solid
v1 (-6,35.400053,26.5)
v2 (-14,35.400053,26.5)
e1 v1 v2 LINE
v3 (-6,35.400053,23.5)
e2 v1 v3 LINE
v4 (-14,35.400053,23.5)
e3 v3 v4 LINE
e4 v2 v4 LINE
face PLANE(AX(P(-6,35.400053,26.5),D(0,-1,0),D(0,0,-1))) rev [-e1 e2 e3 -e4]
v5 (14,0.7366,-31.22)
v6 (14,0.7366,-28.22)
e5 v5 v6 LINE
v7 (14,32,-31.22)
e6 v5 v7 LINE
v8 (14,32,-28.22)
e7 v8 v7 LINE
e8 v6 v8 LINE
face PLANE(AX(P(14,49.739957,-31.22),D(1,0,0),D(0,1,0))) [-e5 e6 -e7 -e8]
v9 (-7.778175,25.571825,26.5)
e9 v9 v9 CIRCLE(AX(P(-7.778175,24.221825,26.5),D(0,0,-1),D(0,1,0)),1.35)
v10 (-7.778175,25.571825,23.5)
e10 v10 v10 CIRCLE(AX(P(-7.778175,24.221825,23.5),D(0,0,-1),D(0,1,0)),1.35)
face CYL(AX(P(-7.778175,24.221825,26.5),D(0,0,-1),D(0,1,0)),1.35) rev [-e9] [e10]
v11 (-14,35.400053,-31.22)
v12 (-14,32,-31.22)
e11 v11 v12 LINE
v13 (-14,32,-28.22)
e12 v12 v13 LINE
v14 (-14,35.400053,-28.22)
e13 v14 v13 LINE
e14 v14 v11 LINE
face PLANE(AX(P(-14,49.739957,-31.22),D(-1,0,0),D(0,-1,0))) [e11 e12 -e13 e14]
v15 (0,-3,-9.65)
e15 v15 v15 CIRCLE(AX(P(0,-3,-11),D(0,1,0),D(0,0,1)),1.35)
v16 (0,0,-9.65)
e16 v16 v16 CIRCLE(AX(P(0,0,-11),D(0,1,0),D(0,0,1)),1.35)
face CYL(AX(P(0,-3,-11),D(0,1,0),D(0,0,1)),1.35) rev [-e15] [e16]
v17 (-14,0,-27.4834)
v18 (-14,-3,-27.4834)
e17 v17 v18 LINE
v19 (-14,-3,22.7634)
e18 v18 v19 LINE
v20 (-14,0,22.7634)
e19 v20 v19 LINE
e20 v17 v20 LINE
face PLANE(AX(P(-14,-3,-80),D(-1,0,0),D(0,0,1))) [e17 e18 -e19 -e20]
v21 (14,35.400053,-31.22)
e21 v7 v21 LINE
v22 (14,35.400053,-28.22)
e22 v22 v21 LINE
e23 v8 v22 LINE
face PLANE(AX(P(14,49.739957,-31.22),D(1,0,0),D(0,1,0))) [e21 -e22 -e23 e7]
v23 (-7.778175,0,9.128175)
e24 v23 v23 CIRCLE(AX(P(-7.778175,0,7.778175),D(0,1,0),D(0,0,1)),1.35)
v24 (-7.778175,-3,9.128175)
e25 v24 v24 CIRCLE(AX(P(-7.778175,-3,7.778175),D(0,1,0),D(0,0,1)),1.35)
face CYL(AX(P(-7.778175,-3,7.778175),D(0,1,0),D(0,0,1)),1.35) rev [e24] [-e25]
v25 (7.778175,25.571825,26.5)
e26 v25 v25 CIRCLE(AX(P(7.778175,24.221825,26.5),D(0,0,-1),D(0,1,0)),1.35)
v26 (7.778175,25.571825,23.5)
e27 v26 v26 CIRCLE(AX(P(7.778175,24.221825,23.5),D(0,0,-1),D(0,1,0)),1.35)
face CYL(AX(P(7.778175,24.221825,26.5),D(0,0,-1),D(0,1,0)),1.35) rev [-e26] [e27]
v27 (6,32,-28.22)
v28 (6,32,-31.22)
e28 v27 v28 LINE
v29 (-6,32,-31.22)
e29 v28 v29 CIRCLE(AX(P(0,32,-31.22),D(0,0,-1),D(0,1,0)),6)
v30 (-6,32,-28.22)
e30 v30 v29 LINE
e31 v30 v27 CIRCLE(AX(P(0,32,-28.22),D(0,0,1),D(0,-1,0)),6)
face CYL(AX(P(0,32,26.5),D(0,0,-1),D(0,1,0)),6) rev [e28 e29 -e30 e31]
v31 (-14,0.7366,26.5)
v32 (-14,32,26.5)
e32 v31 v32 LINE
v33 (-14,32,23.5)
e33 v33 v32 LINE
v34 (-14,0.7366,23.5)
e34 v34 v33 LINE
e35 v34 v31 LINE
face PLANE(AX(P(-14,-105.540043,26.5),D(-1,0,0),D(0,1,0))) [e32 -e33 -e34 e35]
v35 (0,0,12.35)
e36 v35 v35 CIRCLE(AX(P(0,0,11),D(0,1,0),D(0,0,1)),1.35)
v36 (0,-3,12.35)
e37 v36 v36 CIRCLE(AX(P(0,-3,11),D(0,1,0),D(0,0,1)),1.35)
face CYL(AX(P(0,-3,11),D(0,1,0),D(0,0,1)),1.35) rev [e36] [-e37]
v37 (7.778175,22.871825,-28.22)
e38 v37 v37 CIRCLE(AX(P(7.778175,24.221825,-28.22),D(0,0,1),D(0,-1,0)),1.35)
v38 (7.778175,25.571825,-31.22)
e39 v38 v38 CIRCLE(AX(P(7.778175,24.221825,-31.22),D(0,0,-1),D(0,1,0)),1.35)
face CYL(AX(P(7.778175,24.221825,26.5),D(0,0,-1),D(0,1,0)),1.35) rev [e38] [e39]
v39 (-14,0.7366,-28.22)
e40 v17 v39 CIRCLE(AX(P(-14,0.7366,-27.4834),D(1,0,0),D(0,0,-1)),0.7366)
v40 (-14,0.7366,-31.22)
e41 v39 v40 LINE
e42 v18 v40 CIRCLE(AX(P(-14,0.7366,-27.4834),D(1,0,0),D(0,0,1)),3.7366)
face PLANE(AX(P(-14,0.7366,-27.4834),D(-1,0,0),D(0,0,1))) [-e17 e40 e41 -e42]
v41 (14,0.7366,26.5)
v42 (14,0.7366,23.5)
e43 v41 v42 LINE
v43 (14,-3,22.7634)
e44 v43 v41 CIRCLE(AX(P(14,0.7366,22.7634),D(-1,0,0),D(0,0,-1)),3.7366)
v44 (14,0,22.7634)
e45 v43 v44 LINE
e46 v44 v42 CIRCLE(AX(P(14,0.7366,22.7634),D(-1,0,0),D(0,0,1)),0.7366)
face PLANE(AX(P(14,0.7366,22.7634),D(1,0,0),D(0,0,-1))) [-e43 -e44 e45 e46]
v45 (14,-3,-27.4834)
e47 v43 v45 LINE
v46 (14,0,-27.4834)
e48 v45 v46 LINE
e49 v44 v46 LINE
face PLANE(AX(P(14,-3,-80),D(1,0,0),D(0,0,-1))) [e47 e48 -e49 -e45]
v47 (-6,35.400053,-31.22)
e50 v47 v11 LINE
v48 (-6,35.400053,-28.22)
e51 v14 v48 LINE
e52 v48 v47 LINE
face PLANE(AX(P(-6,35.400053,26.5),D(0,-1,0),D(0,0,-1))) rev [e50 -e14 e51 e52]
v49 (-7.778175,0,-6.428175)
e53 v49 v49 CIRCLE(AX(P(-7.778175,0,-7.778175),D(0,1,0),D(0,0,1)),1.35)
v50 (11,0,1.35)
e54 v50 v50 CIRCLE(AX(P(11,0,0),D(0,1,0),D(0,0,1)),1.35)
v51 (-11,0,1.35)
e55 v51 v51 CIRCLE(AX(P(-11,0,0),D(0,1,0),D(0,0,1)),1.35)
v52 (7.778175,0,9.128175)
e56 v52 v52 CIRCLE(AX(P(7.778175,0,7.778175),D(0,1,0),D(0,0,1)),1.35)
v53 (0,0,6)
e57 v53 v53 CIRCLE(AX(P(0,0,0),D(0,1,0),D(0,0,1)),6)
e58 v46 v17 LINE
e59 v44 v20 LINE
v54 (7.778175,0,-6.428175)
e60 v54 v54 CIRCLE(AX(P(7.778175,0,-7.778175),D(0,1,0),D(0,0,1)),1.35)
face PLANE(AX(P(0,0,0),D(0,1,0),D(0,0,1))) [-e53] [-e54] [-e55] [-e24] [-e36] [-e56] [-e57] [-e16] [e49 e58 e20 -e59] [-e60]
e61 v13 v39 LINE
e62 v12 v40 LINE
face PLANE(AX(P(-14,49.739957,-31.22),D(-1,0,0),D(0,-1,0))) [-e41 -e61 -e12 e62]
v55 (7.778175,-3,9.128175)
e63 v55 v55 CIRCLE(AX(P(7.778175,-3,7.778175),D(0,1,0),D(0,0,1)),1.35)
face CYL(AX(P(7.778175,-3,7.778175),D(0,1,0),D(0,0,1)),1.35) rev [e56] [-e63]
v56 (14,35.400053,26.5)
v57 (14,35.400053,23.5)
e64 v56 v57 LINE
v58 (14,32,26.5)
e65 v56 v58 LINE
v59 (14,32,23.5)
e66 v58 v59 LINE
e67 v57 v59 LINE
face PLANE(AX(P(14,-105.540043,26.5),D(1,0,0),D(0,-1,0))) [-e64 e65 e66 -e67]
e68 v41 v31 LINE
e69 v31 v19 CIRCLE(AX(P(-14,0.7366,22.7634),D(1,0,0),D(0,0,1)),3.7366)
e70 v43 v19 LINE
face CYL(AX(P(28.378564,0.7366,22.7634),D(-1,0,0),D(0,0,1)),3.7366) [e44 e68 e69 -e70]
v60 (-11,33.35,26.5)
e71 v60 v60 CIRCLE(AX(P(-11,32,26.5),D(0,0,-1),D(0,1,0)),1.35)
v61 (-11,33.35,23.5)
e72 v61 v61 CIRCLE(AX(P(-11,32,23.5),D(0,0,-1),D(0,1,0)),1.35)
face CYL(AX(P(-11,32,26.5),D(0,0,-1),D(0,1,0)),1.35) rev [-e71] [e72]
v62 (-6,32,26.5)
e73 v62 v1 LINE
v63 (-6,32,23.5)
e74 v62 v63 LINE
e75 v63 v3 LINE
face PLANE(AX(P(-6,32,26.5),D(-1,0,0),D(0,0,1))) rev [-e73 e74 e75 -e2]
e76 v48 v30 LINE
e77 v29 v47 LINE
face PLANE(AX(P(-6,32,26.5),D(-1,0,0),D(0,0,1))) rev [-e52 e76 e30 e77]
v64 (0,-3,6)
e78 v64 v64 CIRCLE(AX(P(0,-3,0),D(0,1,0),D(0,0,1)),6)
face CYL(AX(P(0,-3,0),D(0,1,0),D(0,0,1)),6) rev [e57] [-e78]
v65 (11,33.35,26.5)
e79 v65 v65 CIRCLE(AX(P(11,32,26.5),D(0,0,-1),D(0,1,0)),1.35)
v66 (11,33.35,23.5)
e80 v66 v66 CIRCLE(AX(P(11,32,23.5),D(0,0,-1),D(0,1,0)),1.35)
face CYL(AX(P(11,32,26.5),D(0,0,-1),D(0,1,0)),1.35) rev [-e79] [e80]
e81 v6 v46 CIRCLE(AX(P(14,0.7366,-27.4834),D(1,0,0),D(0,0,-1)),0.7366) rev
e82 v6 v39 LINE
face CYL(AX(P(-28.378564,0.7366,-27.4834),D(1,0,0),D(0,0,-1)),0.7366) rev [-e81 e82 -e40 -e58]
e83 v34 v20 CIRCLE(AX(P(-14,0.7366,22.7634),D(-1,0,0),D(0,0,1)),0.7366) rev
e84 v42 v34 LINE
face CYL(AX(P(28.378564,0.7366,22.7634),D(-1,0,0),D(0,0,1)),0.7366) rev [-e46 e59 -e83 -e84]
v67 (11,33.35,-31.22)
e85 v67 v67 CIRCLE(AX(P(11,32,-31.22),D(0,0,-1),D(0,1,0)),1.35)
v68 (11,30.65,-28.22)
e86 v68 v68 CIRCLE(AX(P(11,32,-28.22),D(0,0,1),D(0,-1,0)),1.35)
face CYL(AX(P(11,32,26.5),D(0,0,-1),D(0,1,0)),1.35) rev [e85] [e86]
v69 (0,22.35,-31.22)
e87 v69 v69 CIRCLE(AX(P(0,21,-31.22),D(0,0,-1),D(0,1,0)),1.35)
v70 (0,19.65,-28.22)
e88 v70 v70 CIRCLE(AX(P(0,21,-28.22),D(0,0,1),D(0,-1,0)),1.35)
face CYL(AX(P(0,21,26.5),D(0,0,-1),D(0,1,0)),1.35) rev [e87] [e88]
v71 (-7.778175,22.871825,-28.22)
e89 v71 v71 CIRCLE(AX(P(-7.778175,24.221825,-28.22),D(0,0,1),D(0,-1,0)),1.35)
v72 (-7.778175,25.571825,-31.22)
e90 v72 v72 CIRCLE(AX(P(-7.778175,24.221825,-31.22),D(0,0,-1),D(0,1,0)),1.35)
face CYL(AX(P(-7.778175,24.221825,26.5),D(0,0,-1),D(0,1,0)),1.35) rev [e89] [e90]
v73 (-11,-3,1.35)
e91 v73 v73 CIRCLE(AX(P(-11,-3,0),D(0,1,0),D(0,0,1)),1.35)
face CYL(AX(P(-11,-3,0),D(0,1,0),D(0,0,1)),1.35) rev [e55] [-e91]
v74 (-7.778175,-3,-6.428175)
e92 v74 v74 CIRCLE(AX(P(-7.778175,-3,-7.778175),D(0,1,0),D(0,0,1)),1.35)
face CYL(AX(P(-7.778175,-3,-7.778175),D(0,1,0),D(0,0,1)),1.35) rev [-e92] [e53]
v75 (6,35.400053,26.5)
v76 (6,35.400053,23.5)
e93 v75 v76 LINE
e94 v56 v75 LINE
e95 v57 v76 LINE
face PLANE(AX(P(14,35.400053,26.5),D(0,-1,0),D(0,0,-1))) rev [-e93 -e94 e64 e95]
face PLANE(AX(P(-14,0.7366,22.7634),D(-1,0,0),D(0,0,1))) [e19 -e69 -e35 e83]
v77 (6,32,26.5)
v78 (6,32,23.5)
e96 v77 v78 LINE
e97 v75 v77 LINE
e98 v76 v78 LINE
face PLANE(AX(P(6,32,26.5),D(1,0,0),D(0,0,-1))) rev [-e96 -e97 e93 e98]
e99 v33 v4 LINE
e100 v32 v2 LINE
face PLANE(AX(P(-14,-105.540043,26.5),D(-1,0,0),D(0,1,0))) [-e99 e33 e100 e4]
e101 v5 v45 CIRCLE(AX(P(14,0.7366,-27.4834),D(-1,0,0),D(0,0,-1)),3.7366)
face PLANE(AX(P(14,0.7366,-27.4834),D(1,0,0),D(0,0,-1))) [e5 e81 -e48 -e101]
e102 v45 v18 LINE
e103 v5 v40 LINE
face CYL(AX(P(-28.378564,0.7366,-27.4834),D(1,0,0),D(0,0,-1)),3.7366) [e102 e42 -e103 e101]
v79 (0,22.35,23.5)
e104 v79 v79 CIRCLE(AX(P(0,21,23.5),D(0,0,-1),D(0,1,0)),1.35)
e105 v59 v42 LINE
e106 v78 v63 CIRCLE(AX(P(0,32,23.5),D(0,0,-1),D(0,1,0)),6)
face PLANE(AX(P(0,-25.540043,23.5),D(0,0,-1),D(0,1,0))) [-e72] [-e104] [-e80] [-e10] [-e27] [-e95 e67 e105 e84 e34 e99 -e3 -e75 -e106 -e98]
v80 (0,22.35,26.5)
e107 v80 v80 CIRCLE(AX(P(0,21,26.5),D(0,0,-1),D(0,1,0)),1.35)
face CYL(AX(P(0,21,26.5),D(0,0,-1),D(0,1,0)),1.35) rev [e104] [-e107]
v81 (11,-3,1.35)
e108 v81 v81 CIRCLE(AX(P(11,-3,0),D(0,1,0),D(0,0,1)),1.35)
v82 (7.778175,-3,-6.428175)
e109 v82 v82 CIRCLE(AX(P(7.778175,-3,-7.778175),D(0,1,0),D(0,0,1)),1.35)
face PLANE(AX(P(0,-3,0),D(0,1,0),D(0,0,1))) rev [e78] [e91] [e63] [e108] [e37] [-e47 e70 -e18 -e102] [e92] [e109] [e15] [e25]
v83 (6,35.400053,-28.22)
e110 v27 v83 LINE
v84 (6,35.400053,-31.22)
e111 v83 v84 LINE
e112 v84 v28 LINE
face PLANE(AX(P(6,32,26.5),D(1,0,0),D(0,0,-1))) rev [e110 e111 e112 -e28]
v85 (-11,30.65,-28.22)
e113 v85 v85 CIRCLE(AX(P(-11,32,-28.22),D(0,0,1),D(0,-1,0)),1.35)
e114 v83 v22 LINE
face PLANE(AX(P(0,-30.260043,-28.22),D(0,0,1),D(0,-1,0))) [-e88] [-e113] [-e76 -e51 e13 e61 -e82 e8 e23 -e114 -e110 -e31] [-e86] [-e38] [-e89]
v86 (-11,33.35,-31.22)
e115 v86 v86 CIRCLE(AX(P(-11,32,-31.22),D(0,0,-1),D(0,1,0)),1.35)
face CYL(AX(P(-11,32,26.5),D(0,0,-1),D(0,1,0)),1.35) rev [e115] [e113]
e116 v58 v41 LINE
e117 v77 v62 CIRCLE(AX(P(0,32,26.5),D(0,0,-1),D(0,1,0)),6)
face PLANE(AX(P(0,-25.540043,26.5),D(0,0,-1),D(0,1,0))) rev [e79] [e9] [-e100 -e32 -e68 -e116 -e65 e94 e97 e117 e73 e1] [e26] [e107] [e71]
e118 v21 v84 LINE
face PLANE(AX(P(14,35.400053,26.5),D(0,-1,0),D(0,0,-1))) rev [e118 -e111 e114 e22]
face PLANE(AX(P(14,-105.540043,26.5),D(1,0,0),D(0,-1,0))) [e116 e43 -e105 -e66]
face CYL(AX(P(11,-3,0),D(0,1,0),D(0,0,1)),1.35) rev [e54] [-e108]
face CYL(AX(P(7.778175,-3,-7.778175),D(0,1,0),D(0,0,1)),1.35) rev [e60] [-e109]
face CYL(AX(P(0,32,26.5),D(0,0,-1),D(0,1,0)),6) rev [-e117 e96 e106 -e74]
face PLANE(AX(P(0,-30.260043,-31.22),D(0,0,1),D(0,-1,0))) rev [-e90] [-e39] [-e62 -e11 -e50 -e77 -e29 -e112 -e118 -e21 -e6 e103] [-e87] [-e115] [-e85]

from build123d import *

# Parameters (mm, degrees)
SKETCH_1_W             = 28
SKETCH_1_H             = 160
SKETCH_1_R             = 6
SKETCH_1_R_2           = 1.35
SM_BASE_FLANGE_1_DEPTH = 3
OTHER_START            = -14
OTHER_1_DEPTH          = 28
OTHER_1_2_DEPTH        = 28
SKETCH_7_R             = 1.35
CUT_EXTRUDE_1_DEPTH    = 81.582164958


# Read off the part's stored shape, not the designer's step: 绘制的折弯1
# Sheet-metal steps are written as plain solids
with BuildPart() as part:
    # Sketch 1 → 基体-法兰1 (new body)
    with BuildSketch(Plane(origin=(0, 0, 0), x_dir=(1, 0, 0), z_dir=(0, 1, 0))):
        Rectangle(SKETCH_1_W, SKETCH_1_H)
        with Locations(Location((0, 0, 0), (0, 0, 270))):
            Circle(SKETCH_1_R, mode=Mode.SUBTRACT)
        with Locations(Location((0, 11, 0), (0, 0, 270))):
            Circle(SKETCH_1_R_2, mode=Mode.SUBTRACT)
        with Locations(Location((7.778174593, 7.778174593, 0), (0, 0, 270))):
            Circle(SKETCH_1_R_2, mode=Mode.SUBTRACT)
        with Locations(Location((11, 0, 0), (0, 0, 270))):
            Circle(SKETCH_1_R_2, mode=Mode.SUBTRACT)
        with Locations(Location((7.778174593, -7.778174593, 0), (0, 0, 270))):
            Circle(SKETCH_1_R_2, mode=Mode.SUBTRACT)
        with Locations(Location((0, -11, 0), (0, 0, 270))):
            Circle(SKETCH_1_R_2, mode=Mode.SUBTRACT)
        with Locations(Location((-7.778174593, -7.778174593, 0), (0, 0, 270))):
            Circle(SKETCH_1_R_2, mode=Mode.SUBTRACT)
        with Locations(Location((-11, 0, 0), (0, 0, 270))):
            Circle(SKETCH_1_R_2, mode=Mode.SUBTRACT)
        with Locations(Location((-7.778174593, 7.778174593, 0), (0, 0, 270))):
            Circle(SKETCH_1_R_2, mode=Mode.SUBTRACT)
    extrude(amount=-SM_BASE_FLANGE_1_DEPTH)

    # Other 1 outline → Other 1 (cut)
    with BuildSketch(Plane.YZ.offset(OTHER_START)):
        with BuildLine():
            ThreePointArc((0, -31.146677222), (-2.154295979, -29.850867001), (-3, -27.4834))
            Line((-3, -27.4834), (-3, -80))
            Line((-3, -80), (0, -80))
            Line((0, -80), (0, -31.146677222))
        make_face()
        with BuildLine():
            Line((-3, 80), (-3, 22.7634))
            ThreePointArc((-3, 22.7634), (-2.154295979, 25.130867001), (0, 26.426677222))
            Line((0, 26.426677222), (0, 80))
            Line((0, 80), (-3, 80))
        make_face()
    extrude(amount=OTHER_1_DEPTH, mode=Mode.SUBTRACT)

    # Other 1 2 outline → Other 1 2 (add)
    with BuildSketch(Plane.YZ.offset(OTHER_START)):
        with BuildLine():
            Line((0, -27.4834), (0, -31.146677222))
            ThreePointArc((0, -31.146677222), (0.36647982, -31.201624121), (0.7366, -31.22))
            Line((0.7366, -31.22), (49.739956935, -31.22))
            Line((49.739956935, -31.22), (49.739956935, -28.22))
            Line((49.739956935, -28.22), (0.7366, -28.22))
            ThreePointArc((0.7366, -28.22), (0.215745145, -28.004254855), (0, -27.4834))
        make_face()
        with BuildLine():
            ThreePointArc((0.7366, 26.5), (0.36647982, 26.481624121), (0, 26.426677222))
            Line((0, 26.426677222), (0, 22.7634))
            ThreePointArc((0, 22.7634), (0.215745145, 23.284254855), (0.7366, 23.5))
            Line((0.7366, 23.5), (54.459956935, 23.5))
            Line((54.459956935, 23.5), (54.459956935, 26.5))
            Line((54.459956935, 26.5), (0.7366, 26.5))
        make_face()
    extrude(amount=OTHER_1_2_DEPTH)

    # 草图7 → 切除-拉伸1 (cut, through all)
    with BuildSketch(Plane(origin=(0, 0, -31.22), x_dir=(-1, 0, 0), z_dir=(0, 0, -1))):
        with Locations(Location((11, 32, 0), (0, 0, 90))):
            Circle(SKETCH_7_R)
        with Locations(Location((7.778174593, 24.221825407, 0), (0, 0, 90))):
            Circle(SKETCH_7_R)
        with Locations(Location((0, 21, 0), (0, 0, 90))):
            Circle(SKETCH_7_R)
        with Locations(Location((-7.778174593, 24.221825407, 0), (0, 0, 90))):
            Circle(SKETCH_7_R)
        with Locations(Location((-11, 32, 0), (0, 0, 90))):
            Circle(SKETCH_7_R)
        with BuildLine():
            Line((-14, 32), (-32.703539992, 32))
            Line((-32.703539992, 32), (-28.620805063, 56.964772816))
            Line((-28.620805063, 56.964772816), (24.538070134, 56.964772816))
            Line((24.538070134, 56.964772816), (24.538070134, 32))
            Line((24.538070134, 32), (14, 32))
            Line((14, 32), (14, 35.400052641))
            Line((14, 35.400052641), (6, 35.400052641))
            Line((6, 35.400052641), (6, 32))
            ThreePointArc((6, 32), (0, 26), (-6, 32))
            Line((-6, 32), (-6, 35.400052641))
            Line((-6, 35.400052641), (-14, 35.400052641))
            Line((-14, 35.400052641), (-14, 32))
        make_face()
    extrude(amount=-CUT_EXTRUDE_1_DEPTH, mode=Mode.SUBTRACT)


solid = part.part
